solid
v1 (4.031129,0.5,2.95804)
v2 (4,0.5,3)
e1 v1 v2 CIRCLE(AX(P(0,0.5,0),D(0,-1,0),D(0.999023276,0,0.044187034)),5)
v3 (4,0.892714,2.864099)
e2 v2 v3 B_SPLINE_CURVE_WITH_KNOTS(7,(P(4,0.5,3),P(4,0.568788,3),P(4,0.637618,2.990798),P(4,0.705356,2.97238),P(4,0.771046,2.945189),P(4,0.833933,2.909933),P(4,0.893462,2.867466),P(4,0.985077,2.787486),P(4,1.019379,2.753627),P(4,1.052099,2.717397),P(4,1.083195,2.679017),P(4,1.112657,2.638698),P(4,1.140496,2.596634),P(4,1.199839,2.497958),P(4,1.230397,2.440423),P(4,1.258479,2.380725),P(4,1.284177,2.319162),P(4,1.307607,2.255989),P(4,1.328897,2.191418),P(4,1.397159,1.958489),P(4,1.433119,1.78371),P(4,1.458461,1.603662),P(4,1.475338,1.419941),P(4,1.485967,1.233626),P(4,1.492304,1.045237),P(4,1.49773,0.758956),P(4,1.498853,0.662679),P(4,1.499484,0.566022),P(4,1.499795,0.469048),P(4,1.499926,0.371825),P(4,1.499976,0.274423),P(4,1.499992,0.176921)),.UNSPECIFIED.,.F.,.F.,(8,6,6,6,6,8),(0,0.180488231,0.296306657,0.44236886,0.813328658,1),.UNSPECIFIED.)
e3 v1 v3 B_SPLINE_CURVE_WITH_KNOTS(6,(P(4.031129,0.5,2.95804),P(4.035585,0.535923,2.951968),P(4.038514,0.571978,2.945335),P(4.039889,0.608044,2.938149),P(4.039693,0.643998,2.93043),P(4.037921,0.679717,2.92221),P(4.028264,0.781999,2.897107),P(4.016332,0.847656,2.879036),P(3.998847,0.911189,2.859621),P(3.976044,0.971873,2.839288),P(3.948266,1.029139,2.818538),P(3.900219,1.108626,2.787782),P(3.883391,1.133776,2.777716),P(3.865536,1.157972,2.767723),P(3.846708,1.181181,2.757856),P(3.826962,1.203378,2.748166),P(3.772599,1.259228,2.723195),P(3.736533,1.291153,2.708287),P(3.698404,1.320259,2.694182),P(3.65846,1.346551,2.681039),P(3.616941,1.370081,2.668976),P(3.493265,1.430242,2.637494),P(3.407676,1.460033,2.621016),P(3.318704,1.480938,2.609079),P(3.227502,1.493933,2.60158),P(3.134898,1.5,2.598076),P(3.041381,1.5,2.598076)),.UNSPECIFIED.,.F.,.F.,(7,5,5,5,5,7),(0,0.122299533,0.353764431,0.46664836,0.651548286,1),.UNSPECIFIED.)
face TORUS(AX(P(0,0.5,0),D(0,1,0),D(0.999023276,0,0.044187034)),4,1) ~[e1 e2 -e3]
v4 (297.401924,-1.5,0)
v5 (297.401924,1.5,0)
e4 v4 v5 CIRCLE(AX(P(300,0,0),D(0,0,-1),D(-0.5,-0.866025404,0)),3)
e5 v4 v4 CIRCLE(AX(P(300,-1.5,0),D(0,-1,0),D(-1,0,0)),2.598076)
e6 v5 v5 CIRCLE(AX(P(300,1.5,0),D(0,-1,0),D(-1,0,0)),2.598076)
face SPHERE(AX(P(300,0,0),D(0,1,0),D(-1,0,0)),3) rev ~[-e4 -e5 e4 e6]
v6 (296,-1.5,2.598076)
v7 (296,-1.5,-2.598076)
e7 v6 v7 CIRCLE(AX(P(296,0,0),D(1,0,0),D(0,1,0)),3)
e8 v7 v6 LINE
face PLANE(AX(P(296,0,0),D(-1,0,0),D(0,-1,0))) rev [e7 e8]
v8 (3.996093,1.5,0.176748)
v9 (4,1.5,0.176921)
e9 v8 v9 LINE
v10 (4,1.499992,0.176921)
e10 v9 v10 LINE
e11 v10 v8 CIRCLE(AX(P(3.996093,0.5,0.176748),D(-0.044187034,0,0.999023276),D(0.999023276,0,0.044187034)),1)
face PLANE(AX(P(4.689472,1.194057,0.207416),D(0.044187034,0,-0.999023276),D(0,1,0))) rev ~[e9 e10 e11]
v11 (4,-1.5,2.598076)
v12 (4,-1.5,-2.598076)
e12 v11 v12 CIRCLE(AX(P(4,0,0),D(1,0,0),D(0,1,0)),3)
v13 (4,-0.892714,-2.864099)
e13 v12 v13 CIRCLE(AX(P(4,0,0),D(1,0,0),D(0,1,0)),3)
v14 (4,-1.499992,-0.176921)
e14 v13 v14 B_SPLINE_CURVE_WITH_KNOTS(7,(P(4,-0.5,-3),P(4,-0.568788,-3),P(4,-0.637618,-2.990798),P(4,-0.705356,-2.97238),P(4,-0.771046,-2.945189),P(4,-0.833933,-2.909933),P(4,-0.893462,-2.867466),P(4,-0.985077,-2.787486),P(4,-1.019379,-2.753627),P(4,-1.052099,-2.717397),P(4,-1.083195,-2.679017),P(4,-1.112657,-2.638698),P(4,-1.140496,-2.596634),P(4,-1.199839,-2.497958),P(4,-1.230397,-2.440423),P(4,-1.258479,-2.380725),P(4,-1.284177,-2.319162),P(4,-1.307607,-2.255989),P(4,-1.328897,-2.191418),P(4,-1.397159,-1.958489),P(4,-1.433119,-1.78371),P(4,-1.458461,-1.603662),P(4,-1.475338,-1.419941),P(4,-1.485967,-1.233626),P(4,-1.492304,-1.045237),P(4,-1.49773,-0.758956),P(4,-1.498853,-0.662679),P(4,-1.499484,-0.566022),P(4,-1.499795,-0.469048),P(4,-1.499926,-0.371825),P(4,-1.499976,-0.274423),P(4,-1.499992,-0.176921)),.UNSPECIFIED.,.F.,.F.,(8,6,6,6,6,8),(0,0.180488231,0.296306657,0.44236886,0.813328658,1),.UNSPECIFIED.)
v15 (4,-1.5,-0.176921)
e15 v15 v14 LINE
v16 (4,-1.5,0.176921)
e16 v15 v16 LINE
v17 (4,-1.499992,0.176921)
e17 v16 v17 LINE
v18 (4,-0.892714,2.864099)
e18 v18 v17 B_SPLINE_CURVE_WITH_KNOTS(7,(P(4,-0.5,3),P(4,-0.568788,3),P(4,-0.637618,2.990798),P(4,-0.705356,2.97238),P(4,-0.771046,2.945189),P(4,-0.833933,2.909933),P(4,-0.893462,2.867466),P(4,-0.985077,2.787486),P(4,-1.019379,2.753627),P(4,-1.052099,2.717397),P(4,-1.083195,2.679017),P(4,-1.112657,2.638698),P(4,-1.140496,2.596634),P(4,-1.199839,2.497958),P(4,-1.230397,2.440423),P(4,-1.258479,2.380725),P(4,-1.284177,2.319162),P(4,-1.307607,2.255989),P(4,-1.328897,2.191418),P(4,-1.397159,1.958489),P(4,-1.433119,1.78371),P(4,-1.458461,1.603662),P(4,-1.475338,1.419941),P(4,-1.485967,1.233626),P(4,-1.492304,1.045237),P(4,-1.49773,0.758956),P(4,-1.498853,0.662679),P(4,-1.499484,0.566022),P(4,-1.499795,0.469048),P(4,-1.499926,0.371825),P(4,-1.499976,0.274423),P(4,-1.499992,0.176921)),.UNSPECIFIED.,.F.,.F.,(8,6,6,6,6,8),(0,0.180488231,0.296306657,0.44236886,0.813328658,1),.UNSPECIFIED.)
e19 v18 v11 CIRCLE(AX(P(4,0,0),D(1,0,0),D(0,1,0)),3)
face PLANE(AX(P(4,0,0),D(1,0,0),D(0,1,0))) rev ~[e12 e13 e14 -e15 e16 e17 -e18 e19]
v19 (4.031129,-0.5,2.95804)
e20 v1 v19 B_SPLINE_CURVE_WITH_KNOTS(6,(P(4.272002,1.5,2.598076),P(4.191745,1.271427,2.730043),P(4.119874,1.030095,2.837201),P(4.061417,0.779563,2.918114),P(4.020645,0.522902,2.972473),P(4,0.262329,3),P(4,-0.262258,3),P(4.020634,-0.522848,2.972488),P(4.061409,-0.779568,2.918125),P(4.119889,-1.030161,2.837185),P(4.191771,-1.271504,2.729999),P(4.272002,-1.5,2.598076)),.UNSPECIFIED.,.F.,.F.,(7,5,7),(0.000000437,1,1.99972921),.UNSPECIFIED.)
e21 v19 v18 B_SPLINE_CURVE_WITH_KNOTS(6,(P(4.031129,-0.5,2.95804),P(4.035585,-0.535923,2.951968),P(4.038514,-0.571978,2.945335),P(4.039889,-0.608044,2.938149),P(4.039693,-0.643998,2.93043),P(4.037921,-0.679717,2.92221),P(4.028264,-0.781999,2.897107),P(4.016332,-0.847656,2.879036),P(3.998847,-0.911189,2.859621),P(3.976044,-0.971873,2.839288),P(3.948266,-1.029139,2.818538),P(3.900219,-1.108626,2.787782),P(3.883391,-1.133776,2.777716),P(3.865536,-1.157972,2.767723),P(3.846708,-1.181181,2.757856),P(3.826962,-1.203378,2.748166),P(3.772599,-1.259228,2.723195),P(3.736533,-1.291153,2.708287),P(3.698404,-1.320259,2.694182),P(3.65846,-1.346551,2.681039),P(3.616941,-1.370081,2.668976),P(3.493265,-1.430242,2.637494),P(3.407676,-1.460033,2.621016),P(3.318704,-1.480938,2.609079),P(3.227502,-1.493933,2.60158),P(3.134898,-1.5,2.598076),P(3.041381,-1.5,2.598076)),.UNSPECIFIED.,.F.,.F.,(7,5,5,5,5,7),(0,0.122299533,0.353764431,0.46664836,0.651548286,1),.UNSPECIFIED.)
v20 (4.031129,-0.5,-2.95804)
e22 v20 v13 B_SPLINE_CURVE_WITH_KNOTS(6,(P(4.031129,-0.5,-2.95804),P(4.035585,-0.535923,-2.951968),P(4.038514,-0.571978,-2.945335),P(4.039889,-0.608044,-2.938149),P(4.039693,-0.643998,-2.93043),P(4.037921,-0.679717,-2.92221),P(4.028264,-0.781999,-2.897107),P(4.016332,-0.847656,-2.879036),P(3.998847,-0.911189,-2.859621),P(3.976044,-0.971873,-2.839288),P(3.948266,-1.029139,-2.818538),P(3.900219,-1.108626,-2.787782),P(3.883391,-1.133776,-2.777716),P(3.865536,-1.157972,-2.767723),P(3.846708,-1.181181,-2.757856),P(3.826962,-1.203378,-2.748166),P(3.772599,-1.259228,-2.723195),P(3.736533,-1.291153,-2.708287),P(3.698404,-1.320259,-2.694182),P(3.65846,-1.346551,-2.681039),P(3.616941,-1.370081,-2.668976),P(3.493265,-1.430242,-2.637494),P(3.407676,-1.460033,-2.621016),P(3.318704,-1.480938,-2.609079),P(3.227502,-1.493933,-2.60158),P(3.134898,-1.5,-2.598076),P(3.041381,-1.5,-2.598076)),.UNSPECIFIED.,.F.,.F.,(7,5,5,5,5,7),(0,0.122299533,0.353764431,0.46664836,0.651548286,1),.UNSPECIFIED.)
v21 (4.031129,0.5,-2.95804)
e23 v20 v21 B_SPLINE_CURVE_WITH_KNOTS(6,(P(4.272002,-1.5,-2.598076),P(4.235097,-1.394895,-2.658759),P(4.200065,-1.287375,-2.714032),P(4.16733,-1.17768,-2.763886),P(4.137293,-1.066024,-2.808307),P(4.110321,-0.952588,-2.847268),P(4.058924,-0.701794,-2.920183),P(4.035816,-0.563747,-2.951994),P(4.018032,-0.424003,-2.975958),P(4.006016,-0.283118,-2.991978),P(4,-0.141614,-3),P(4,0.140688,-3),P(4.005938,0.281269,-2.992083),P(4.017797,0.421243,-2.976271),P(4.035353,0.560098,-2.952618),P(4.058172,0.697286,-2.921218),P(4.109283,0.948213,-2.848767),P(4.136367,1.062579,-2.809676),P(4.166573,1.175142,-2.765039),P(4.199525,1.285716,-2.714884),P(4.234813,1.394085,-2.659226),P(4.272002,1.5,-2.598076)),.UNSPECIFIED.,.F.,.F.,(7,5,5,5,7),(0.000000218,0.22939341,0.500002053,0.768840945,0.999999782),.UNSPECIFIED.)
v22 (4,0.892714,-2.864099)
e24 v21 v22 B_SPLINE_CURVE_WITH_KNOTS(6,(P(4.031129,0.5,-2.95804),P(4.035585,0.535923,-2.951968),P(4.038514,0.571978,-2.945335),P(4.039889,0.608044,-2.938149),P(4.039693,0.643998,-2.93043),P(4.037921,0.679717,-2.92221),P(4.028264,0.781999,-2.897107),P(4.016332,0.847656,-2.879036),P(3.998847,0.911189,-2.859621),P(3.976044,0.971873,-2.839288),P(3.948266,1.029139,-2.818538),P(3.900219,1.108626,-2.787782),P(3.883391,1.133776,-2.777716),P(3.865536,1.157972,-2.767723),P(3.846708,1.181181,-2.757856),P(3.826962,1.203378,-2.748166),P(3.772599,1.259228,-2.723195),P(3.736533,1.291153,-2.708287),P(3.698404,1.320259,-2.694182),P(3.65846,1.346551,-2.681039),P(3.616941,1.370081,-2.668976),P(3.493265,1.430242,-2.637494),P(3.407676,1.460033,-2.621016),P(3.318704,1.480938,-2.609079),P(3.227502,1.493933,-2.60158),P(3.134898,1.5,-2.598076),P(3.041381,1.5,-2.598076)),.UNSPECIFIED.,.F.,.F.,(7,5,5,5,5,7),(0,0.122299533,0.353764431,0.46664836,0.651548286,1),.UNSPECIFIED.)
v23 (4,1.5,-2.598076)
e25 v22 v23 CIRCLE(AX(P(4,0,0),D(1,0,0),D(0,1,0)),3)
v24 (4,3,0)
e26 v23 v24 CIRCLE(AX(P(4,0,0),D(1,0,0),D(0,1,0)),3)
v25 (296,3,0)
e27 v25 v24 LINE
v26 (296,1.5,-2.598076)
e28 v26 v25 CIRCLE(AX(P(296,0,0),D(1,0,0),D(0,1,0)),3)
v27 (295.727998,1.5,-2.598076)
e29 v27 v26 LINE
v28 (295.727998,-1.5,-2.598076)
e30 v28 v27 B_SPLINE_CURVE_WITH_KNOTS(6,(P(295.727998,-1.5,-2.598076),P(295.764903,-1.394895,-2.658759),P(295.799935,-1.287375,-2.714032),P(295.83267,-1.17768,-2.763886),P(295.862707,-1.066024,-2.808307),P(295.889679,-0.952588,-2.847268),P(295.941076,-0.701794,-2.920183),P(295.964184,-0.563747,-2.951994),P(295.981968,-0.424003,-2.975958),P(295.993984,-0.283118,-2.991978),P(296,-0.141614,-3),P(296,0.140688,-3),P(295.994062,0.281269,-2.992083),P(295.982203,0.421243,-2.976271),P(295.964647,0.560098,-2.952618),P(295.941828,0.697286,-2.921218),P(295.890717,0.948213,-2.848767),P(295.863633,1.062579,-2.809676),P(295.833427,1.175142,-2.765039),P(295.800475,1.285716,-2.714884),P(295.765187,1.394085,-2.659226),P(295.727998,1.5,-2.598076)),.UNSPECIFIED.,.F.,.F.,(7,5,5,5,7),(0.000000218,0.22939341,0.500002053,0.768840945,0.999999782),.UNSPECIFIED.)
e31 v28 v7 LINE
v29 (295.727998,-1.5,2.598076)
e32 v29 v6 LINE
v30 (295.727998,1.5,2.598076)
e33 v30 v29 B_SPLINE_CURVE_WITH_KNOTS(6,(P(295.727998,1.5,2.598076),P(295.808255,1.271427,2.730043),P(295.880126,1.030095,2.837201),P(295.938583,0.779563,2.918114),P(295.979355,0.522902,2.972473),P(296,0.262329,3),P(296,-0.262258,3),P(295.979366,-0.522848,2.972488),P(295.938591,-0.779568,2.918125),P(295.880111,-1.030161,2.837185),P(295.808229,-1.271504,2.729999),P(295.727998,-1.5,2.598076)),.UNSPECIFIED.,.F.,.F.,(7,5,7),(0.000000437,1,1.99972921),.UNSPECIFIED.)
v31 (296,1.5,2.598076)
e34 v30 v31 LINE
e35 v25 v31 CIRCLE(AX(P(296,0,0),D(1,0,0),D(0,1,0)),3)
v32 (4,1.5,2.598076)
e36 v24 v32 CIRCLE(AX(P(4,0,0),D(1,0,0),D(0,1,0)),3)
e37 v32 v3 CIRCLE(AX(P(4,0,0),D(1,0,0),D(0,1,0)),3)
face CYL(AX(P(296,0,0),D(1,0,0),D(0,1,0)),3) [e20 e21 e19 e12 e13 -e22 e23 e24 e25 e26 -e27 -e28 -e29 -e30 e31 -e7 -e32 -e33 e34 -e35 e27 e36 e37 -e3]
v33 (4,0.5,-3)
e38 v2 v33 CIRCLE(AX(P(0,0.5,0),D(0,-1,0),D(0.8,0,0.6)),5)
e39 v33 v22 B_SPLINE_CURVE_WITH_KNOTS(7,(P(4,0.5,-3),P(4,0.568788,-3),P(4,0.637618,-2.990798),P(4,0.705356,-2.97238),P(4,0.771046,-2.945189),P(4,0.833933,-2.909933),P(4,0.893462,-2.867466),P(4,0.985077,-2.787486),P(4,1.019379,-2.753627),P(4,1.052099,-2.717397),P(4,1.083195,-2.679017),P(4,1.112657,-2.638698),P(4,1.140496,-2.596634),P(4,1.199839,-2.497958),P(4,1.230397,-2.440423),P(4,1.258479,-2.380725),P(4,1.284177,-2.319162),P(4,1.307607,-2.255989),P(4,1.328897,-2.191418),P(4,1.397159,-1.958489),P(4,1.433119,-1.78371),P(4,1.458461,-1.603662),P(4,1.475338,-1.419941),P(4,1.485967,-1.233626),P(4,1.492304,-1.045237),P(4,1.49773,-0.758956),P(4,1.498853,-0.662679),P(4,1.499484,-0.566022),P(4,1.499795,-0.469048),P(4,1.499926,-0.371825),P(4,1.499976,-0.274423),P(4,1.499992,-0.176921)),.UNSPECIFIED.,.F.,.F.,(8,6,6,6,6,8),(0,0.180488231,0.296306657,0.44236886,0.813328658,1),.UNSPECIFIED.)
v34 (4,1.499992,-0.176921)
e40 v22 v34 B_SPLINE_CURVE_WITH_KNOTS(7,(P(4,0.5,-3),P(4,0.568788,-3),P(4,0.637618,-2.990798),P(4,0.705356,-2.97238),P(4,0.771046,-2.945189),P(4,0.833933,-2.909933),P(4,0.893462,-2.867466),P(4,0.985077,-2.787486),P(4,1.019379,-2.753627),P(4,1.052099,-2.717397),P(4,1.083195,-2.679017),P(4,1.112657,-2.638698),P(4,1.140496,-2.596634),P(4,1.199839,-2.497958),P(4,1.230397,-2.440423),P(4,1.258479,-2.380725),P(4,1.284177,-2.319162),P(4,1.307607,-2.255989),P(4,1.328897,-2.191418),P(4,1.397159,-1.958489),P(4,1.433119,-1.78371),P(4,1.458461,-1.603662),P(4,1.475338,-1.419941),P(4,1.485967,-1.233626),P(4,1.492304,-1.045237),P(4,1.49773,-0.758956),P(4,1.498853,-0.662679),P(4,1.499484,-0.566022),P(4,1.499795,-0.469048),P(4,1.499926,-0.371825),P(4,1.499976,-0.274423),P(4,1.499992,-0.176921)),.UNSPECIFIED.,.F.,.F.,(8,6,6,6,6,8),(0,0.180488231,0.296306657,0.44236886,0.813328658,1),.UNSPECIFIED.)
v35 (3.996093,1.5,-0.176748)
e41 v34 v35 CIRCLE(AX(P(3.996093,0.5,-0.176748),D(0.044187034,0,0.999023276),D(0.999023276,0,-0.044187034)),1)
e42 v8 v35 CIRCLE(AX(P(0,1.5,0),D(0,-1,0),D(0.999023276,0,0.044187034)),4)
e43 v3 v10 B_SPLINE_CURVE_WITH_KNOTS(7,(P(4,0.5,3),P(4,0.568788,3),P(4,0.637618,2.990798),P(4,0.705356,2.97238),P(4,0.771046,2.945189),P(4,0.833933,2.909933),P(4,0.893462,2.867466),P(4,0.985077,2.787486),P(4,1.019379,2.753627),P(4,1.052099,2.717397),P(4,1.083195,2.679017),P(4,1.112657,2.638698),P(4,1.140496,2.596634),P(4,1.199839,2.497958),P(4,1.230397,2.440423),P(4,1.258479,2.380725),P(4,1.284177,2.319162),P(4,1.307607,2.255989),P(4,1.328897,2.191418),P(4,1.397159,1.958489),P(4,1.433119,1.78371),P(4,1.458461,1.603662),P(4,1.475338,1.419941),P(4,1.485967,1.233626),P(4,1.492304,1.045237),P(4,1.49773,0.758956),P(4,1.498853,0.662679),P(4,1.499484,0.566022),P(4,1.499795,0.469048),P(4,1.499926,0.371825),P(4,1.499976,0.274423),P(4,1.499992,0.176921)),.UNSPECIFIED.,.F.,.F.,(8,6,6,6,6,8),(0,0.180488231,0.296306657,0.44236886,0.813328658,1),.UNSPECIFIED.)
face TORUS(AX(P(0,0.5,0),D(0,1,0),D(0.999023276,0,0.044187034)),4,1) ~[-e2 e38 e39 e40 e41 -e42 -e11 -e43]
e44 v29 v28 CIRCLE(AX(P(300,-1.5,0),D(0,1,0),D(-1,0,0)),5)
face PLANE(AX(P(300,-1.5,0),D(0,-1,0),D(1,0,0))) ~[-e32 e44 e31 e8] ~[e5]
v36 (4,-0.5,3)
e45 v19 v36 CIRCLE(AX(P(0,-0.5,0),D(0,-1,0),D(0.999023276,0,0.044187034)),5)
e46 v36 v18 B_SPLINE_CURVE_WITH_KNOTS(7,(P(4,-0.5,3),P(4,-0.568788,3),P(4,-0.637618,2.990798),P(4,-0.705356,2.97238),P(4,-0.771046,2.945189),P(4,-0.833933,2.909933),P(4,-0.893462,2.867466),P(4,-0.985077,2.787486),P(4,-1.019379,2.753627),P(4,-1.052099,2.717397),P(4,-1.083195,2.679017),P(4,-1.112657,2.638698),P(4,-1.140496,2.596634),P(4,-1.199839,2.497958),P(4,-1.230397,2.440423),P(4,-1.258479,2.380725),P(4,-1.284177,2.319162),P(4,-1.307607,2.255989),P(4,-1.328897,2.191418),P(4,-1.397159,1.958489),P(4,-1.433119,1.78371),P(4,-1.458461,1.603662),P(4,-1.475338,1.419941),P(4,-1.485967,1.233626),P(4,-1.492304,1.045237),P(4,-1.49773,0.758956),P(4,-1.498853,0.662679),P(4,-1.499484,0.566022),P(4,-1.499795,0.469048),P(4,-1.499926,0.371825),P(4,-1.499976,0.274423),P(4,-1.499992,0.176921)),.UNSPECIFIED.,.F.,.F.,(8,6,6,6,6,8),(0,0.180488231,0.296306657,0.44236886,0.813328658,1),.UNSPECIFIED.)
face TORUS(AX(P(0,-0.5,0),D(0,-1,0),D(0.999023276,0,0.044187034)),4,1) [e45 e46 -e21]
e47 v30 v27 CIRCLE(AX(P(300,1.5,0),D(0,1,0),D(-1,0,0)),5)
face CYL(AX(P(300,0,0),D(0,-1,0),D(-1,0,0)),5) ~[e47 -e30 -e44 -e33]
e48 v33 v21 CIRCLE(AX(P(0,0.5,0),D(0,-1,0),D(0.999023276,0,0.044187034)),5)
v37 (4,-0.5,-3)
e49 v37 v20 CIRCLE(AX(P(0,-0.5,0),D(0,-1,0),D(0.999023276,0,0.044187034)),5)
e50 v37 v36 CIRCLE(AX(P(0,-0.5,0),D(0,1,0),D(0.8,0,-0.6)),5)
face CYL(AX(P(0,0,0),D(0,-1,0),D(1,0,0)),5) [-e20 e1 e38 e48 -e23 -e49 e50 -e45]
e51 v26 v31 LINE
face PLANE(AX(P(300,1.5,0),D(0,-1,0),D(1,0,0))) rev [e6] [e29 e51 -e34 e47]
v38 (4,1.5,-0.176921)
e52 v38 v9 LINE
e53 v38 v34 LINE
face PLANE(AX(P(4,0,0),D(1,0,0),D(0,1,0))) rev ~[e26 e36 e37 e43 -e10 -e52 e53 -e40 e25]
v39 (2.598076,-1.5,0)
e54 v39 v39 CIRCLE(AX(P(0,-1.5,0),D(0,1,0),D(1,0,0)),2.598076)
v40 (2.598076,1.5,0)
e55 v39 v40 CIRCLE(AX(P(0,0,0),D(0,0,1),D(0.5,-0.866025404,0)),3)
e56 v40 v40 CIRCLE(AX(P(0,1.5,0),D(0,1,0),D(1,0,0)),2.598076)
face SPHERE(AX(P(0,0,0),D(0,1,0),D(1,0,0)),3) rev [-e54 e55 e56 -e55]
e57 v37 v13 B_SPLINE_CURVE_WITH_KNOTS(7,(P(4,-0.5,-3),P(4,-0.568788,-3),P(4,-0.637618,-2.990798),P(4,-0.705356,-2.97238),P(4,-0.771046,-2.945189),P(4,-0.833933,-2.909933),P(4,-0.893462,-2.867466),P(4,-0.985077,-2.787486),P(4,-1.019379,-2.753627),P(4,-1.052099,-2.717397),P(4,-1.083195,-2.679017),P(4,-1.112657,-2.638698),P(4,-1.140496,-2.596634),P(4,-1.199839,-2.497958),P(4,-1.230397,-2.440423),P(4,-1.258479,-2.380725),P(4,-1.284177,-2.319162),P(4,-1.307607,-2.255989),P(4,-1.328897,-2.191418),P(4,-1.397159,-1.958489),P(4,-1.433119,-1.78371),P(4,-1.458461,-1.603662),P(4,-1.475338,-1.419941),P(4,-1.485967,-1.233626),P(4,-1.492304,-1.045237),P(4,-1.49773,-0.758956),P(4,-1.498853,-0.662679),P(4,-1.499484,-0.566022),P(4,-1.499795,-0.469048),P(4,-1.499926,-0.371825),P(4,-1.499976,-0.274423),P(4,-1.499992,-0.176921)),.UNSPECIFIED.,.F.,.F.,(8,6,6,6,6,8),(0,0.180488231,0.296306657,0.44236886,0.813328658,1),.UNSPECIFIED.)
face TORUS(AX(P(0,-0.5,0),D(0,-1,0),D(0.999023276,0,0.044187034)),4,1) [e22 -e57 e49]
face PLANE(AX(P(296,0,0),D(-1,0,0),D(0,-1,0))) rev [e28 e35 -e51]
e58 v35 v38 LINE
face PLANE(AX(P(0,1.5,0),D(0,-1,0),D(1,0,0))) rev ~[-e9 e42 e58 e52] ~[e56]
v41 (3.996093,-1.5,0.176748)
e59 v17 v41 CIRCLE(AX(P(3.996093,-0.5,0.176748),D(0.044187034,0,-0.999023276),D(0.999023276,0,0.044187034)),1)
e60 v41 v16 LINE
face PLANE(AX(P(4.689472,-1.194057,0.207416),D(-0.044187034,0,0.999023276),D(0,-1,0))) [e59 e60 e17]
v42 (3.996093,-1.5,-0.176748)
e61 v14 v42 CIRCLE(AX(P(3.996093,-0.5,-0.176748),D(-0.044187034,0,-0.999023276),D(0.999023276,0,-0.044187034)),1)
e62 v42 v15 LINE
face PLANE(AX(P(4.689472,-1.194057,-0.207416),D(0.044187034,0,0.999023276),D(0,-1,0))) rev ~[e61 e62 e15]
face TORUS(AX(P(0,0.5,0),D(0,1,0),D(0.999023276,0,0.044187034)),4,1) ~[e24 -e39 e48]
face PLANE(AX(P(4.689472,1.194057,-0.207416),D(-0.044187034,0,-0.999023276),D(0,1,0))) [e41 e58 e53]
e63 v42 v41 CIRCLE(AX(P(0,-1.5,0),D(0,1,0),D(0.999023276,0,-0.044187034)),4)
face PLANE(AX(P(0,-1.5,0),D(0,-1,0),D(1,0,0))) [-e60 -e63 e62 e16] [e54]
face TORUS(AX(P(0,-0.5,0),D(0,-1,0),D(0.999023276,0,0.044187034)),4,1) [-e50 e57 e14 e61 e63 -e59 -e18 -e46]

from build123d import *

# Parameters (mm, degrees)
F1_R         = 5
F1_R_2       = 2
F2_DEPTH     = 1.5
F5_R         = 3
F6_DEPTH     = 146
F9_T4_ANGLE  = 354.9348896549
F9_T9_ANGLE  = 354.9348896549
F9_S10_R     = 3
F9_T11_DEPTH = 9
F9_T15_ANGLE = 354.9348896549
F9_T20_ANGLE = 354.9348896549
F9_S21_R     = 3
F9_T22_DEPTH = 9


# Not quite as in the source:
# - a fillet or chamfer that OpenCascade refuses, or shapes differently, is made with other operations: its cross-section is extruded or revolved along the edge and cut away or added


with BuildPart() as f2:
    # F1 (on Front) → F2 (new body, symmetric)
    with BuildSketch(Plane.XZ):
        Circle(F1_R)
        Circle(F1_R_2, mode=Mode.SUBTRACT)
    extrude(amount=F2_DEPTH, both=True)

    # F0 (on Top) → F3 (revolve, cut)
    with BuildSketch(Plane.XY):
        with BuildLine():
            Line((1.5, 2.5980762114), (1.5, -2.5980762114))
            ThreePointArc((1.5, -2.5980762114), (3, 0), (1.5, 2.5980762114))
        make_face()
    revolve(axis=Axis((0, 0.5133161101, 0), (0, -1, 0)), mode=Mode.SUBTRACT)

    # F5 (on offset) → F6 (join)
    with BuildSketch(Plane.YZ.offset(4)):
        Circle(F5_R)
    extrude(amount=F6_DEPTH)

    # F8: F2 across plane


with BuildPart() as f2_1:
    add(f2.part)
    add(f2.part.mirror(Plane.YZ.offset(150)))

    # F9: fillet of radius 1 on 2 edges, made by hand


with BuildPart() as f9_tool2:
    # F9_s3 → F9_t4 (revolve)
    with BuildSketch(Plane(origin=(0, 0, 0), x_dir=(0, 1, 0), z_dir=(0.0441870344, 0, -0.999023276))):
        with BuildLine():
            ThreePointArc((-0.5, 5), (-1.2071067812, 4.7071067812), (-1.5, 4))
            Line((-1.5, 4), (-1.5, 5))
            Line((-1.5, 5), (-0.5, 5))
        make_face()
    revolve(axis=Axis((0, -1.5, 0), (0, -1, 0)), revolution_arc=F9_T4_ANGLE)

    split(bisect_by=Plane.YZ.offset(4), keep=Keep.BOTTOM)


with BuildPart() as f2_2:
    add(f2_1.part)

    # F9_t1: cut F9_tool2
    add(f9_tool2.part, mode=Mode.SUBTRACT)


with BuildPart() as f9_tool7:
    # F9_s8 → F9_t9 (revolve)
    with BuildSketch(Plane(origin=(0, 0, 0), x_dir=(0, 1, 0), z_dir=(0.0441870344, 0, -0.999023276))):
        with BuildLine():
            ThreePointArc((-0.5, 5), (-1.2071067812, 4.7071067812), (-1.5, 4))
            Line((-1.5, 4), (-1.5, 5))
            Line((-1.5, 5), (-0.5, 5))
        make_face()
    revolve(axis=Axis((0, -1.5, 0), (0, -1, 0)), revolution_arc=F9_T9_ANGLE)

    # F9_s10 → F9_t11 (cut, symmetric)
    with BuildSketch(Plane.YZ):
        Circle(F9_S10_R)
    extrude(amount=F9_T11_DEPTH, both=True, mode=Mode.SUBTRACT)


with BuildPart() as f2_3:
    add(f2_2.part)

    # F9_t6: cut F9_tool7
    add(f9_tool7.part, mode=Mode.SUBTRACT)


with BuildPart() as f9_tool13:
    # F9_s14 → F9_t15 (revolve)
    with BuildSketch(Plane(origin=(0, 0, 0), x_dir=(0, 1, 0), z_dir=(0.0441870344, 0, -0.999023276))):
        with BuildLine():
            ThreePointArc((0.5, 5), (1.2071067812, 4.7071067812), (1.5, 4))
            Line((1.5, 4), (1.5, 5))
            Line((1.5, 5), (0.5, 5))
        make_face()
    revolve(axis=Axis((0, 1.5, 0), (0, -1, 0)), revolution_arc=F9_T15_ANGLE)

    split(bisect_by=Plane.YZ.offset(4), keep=Keep.BOTTOM)


with BuildPart() as f2_4:
    add(f2_3.part)

    # F9_t12: cut F9_tool13
    add(f9_tool13.part, mode=Mode.SUBTRACT)


with BuildPart() as f9_tool18:
    # F9_s19 → F9_t20 (revolve)
    with BuildSketch(Plane(origin=(0, 0, 0), x_dir=(0, 1, 0), z_dir=(0.0441870344, 0, -0.999023276))):
        with BuildLine():
            ThreePointArc((0.5, 5), (1.2071067812, 4.7071067812), (1.5, 4))
            Line((1.5, 4), (1.5, 5))
            Line((1.5, 5), (0.5, 5))
        make_face()
    revolve(axis=Axis((0, 1.5, 0), (0, -1, 0)), revolution_arc=F9_T20_ANGLE)

    # F9_s21 → F9_t22 (cut, symmetric)
    with BuildSketch(Plane.YZ):
        Circle(F9_S21_R)
    extrude(amount=F9_T22_DEPTH, both=True, mode=Mode.SUBTRACT)


with BuildPart() as f2_5:
    add(f2_4.part)

    # F9_t17: cut F9_tool18
    add(f9_tool18.part, mode=Mode.SUBTRACT)


solid = f2_5.part
